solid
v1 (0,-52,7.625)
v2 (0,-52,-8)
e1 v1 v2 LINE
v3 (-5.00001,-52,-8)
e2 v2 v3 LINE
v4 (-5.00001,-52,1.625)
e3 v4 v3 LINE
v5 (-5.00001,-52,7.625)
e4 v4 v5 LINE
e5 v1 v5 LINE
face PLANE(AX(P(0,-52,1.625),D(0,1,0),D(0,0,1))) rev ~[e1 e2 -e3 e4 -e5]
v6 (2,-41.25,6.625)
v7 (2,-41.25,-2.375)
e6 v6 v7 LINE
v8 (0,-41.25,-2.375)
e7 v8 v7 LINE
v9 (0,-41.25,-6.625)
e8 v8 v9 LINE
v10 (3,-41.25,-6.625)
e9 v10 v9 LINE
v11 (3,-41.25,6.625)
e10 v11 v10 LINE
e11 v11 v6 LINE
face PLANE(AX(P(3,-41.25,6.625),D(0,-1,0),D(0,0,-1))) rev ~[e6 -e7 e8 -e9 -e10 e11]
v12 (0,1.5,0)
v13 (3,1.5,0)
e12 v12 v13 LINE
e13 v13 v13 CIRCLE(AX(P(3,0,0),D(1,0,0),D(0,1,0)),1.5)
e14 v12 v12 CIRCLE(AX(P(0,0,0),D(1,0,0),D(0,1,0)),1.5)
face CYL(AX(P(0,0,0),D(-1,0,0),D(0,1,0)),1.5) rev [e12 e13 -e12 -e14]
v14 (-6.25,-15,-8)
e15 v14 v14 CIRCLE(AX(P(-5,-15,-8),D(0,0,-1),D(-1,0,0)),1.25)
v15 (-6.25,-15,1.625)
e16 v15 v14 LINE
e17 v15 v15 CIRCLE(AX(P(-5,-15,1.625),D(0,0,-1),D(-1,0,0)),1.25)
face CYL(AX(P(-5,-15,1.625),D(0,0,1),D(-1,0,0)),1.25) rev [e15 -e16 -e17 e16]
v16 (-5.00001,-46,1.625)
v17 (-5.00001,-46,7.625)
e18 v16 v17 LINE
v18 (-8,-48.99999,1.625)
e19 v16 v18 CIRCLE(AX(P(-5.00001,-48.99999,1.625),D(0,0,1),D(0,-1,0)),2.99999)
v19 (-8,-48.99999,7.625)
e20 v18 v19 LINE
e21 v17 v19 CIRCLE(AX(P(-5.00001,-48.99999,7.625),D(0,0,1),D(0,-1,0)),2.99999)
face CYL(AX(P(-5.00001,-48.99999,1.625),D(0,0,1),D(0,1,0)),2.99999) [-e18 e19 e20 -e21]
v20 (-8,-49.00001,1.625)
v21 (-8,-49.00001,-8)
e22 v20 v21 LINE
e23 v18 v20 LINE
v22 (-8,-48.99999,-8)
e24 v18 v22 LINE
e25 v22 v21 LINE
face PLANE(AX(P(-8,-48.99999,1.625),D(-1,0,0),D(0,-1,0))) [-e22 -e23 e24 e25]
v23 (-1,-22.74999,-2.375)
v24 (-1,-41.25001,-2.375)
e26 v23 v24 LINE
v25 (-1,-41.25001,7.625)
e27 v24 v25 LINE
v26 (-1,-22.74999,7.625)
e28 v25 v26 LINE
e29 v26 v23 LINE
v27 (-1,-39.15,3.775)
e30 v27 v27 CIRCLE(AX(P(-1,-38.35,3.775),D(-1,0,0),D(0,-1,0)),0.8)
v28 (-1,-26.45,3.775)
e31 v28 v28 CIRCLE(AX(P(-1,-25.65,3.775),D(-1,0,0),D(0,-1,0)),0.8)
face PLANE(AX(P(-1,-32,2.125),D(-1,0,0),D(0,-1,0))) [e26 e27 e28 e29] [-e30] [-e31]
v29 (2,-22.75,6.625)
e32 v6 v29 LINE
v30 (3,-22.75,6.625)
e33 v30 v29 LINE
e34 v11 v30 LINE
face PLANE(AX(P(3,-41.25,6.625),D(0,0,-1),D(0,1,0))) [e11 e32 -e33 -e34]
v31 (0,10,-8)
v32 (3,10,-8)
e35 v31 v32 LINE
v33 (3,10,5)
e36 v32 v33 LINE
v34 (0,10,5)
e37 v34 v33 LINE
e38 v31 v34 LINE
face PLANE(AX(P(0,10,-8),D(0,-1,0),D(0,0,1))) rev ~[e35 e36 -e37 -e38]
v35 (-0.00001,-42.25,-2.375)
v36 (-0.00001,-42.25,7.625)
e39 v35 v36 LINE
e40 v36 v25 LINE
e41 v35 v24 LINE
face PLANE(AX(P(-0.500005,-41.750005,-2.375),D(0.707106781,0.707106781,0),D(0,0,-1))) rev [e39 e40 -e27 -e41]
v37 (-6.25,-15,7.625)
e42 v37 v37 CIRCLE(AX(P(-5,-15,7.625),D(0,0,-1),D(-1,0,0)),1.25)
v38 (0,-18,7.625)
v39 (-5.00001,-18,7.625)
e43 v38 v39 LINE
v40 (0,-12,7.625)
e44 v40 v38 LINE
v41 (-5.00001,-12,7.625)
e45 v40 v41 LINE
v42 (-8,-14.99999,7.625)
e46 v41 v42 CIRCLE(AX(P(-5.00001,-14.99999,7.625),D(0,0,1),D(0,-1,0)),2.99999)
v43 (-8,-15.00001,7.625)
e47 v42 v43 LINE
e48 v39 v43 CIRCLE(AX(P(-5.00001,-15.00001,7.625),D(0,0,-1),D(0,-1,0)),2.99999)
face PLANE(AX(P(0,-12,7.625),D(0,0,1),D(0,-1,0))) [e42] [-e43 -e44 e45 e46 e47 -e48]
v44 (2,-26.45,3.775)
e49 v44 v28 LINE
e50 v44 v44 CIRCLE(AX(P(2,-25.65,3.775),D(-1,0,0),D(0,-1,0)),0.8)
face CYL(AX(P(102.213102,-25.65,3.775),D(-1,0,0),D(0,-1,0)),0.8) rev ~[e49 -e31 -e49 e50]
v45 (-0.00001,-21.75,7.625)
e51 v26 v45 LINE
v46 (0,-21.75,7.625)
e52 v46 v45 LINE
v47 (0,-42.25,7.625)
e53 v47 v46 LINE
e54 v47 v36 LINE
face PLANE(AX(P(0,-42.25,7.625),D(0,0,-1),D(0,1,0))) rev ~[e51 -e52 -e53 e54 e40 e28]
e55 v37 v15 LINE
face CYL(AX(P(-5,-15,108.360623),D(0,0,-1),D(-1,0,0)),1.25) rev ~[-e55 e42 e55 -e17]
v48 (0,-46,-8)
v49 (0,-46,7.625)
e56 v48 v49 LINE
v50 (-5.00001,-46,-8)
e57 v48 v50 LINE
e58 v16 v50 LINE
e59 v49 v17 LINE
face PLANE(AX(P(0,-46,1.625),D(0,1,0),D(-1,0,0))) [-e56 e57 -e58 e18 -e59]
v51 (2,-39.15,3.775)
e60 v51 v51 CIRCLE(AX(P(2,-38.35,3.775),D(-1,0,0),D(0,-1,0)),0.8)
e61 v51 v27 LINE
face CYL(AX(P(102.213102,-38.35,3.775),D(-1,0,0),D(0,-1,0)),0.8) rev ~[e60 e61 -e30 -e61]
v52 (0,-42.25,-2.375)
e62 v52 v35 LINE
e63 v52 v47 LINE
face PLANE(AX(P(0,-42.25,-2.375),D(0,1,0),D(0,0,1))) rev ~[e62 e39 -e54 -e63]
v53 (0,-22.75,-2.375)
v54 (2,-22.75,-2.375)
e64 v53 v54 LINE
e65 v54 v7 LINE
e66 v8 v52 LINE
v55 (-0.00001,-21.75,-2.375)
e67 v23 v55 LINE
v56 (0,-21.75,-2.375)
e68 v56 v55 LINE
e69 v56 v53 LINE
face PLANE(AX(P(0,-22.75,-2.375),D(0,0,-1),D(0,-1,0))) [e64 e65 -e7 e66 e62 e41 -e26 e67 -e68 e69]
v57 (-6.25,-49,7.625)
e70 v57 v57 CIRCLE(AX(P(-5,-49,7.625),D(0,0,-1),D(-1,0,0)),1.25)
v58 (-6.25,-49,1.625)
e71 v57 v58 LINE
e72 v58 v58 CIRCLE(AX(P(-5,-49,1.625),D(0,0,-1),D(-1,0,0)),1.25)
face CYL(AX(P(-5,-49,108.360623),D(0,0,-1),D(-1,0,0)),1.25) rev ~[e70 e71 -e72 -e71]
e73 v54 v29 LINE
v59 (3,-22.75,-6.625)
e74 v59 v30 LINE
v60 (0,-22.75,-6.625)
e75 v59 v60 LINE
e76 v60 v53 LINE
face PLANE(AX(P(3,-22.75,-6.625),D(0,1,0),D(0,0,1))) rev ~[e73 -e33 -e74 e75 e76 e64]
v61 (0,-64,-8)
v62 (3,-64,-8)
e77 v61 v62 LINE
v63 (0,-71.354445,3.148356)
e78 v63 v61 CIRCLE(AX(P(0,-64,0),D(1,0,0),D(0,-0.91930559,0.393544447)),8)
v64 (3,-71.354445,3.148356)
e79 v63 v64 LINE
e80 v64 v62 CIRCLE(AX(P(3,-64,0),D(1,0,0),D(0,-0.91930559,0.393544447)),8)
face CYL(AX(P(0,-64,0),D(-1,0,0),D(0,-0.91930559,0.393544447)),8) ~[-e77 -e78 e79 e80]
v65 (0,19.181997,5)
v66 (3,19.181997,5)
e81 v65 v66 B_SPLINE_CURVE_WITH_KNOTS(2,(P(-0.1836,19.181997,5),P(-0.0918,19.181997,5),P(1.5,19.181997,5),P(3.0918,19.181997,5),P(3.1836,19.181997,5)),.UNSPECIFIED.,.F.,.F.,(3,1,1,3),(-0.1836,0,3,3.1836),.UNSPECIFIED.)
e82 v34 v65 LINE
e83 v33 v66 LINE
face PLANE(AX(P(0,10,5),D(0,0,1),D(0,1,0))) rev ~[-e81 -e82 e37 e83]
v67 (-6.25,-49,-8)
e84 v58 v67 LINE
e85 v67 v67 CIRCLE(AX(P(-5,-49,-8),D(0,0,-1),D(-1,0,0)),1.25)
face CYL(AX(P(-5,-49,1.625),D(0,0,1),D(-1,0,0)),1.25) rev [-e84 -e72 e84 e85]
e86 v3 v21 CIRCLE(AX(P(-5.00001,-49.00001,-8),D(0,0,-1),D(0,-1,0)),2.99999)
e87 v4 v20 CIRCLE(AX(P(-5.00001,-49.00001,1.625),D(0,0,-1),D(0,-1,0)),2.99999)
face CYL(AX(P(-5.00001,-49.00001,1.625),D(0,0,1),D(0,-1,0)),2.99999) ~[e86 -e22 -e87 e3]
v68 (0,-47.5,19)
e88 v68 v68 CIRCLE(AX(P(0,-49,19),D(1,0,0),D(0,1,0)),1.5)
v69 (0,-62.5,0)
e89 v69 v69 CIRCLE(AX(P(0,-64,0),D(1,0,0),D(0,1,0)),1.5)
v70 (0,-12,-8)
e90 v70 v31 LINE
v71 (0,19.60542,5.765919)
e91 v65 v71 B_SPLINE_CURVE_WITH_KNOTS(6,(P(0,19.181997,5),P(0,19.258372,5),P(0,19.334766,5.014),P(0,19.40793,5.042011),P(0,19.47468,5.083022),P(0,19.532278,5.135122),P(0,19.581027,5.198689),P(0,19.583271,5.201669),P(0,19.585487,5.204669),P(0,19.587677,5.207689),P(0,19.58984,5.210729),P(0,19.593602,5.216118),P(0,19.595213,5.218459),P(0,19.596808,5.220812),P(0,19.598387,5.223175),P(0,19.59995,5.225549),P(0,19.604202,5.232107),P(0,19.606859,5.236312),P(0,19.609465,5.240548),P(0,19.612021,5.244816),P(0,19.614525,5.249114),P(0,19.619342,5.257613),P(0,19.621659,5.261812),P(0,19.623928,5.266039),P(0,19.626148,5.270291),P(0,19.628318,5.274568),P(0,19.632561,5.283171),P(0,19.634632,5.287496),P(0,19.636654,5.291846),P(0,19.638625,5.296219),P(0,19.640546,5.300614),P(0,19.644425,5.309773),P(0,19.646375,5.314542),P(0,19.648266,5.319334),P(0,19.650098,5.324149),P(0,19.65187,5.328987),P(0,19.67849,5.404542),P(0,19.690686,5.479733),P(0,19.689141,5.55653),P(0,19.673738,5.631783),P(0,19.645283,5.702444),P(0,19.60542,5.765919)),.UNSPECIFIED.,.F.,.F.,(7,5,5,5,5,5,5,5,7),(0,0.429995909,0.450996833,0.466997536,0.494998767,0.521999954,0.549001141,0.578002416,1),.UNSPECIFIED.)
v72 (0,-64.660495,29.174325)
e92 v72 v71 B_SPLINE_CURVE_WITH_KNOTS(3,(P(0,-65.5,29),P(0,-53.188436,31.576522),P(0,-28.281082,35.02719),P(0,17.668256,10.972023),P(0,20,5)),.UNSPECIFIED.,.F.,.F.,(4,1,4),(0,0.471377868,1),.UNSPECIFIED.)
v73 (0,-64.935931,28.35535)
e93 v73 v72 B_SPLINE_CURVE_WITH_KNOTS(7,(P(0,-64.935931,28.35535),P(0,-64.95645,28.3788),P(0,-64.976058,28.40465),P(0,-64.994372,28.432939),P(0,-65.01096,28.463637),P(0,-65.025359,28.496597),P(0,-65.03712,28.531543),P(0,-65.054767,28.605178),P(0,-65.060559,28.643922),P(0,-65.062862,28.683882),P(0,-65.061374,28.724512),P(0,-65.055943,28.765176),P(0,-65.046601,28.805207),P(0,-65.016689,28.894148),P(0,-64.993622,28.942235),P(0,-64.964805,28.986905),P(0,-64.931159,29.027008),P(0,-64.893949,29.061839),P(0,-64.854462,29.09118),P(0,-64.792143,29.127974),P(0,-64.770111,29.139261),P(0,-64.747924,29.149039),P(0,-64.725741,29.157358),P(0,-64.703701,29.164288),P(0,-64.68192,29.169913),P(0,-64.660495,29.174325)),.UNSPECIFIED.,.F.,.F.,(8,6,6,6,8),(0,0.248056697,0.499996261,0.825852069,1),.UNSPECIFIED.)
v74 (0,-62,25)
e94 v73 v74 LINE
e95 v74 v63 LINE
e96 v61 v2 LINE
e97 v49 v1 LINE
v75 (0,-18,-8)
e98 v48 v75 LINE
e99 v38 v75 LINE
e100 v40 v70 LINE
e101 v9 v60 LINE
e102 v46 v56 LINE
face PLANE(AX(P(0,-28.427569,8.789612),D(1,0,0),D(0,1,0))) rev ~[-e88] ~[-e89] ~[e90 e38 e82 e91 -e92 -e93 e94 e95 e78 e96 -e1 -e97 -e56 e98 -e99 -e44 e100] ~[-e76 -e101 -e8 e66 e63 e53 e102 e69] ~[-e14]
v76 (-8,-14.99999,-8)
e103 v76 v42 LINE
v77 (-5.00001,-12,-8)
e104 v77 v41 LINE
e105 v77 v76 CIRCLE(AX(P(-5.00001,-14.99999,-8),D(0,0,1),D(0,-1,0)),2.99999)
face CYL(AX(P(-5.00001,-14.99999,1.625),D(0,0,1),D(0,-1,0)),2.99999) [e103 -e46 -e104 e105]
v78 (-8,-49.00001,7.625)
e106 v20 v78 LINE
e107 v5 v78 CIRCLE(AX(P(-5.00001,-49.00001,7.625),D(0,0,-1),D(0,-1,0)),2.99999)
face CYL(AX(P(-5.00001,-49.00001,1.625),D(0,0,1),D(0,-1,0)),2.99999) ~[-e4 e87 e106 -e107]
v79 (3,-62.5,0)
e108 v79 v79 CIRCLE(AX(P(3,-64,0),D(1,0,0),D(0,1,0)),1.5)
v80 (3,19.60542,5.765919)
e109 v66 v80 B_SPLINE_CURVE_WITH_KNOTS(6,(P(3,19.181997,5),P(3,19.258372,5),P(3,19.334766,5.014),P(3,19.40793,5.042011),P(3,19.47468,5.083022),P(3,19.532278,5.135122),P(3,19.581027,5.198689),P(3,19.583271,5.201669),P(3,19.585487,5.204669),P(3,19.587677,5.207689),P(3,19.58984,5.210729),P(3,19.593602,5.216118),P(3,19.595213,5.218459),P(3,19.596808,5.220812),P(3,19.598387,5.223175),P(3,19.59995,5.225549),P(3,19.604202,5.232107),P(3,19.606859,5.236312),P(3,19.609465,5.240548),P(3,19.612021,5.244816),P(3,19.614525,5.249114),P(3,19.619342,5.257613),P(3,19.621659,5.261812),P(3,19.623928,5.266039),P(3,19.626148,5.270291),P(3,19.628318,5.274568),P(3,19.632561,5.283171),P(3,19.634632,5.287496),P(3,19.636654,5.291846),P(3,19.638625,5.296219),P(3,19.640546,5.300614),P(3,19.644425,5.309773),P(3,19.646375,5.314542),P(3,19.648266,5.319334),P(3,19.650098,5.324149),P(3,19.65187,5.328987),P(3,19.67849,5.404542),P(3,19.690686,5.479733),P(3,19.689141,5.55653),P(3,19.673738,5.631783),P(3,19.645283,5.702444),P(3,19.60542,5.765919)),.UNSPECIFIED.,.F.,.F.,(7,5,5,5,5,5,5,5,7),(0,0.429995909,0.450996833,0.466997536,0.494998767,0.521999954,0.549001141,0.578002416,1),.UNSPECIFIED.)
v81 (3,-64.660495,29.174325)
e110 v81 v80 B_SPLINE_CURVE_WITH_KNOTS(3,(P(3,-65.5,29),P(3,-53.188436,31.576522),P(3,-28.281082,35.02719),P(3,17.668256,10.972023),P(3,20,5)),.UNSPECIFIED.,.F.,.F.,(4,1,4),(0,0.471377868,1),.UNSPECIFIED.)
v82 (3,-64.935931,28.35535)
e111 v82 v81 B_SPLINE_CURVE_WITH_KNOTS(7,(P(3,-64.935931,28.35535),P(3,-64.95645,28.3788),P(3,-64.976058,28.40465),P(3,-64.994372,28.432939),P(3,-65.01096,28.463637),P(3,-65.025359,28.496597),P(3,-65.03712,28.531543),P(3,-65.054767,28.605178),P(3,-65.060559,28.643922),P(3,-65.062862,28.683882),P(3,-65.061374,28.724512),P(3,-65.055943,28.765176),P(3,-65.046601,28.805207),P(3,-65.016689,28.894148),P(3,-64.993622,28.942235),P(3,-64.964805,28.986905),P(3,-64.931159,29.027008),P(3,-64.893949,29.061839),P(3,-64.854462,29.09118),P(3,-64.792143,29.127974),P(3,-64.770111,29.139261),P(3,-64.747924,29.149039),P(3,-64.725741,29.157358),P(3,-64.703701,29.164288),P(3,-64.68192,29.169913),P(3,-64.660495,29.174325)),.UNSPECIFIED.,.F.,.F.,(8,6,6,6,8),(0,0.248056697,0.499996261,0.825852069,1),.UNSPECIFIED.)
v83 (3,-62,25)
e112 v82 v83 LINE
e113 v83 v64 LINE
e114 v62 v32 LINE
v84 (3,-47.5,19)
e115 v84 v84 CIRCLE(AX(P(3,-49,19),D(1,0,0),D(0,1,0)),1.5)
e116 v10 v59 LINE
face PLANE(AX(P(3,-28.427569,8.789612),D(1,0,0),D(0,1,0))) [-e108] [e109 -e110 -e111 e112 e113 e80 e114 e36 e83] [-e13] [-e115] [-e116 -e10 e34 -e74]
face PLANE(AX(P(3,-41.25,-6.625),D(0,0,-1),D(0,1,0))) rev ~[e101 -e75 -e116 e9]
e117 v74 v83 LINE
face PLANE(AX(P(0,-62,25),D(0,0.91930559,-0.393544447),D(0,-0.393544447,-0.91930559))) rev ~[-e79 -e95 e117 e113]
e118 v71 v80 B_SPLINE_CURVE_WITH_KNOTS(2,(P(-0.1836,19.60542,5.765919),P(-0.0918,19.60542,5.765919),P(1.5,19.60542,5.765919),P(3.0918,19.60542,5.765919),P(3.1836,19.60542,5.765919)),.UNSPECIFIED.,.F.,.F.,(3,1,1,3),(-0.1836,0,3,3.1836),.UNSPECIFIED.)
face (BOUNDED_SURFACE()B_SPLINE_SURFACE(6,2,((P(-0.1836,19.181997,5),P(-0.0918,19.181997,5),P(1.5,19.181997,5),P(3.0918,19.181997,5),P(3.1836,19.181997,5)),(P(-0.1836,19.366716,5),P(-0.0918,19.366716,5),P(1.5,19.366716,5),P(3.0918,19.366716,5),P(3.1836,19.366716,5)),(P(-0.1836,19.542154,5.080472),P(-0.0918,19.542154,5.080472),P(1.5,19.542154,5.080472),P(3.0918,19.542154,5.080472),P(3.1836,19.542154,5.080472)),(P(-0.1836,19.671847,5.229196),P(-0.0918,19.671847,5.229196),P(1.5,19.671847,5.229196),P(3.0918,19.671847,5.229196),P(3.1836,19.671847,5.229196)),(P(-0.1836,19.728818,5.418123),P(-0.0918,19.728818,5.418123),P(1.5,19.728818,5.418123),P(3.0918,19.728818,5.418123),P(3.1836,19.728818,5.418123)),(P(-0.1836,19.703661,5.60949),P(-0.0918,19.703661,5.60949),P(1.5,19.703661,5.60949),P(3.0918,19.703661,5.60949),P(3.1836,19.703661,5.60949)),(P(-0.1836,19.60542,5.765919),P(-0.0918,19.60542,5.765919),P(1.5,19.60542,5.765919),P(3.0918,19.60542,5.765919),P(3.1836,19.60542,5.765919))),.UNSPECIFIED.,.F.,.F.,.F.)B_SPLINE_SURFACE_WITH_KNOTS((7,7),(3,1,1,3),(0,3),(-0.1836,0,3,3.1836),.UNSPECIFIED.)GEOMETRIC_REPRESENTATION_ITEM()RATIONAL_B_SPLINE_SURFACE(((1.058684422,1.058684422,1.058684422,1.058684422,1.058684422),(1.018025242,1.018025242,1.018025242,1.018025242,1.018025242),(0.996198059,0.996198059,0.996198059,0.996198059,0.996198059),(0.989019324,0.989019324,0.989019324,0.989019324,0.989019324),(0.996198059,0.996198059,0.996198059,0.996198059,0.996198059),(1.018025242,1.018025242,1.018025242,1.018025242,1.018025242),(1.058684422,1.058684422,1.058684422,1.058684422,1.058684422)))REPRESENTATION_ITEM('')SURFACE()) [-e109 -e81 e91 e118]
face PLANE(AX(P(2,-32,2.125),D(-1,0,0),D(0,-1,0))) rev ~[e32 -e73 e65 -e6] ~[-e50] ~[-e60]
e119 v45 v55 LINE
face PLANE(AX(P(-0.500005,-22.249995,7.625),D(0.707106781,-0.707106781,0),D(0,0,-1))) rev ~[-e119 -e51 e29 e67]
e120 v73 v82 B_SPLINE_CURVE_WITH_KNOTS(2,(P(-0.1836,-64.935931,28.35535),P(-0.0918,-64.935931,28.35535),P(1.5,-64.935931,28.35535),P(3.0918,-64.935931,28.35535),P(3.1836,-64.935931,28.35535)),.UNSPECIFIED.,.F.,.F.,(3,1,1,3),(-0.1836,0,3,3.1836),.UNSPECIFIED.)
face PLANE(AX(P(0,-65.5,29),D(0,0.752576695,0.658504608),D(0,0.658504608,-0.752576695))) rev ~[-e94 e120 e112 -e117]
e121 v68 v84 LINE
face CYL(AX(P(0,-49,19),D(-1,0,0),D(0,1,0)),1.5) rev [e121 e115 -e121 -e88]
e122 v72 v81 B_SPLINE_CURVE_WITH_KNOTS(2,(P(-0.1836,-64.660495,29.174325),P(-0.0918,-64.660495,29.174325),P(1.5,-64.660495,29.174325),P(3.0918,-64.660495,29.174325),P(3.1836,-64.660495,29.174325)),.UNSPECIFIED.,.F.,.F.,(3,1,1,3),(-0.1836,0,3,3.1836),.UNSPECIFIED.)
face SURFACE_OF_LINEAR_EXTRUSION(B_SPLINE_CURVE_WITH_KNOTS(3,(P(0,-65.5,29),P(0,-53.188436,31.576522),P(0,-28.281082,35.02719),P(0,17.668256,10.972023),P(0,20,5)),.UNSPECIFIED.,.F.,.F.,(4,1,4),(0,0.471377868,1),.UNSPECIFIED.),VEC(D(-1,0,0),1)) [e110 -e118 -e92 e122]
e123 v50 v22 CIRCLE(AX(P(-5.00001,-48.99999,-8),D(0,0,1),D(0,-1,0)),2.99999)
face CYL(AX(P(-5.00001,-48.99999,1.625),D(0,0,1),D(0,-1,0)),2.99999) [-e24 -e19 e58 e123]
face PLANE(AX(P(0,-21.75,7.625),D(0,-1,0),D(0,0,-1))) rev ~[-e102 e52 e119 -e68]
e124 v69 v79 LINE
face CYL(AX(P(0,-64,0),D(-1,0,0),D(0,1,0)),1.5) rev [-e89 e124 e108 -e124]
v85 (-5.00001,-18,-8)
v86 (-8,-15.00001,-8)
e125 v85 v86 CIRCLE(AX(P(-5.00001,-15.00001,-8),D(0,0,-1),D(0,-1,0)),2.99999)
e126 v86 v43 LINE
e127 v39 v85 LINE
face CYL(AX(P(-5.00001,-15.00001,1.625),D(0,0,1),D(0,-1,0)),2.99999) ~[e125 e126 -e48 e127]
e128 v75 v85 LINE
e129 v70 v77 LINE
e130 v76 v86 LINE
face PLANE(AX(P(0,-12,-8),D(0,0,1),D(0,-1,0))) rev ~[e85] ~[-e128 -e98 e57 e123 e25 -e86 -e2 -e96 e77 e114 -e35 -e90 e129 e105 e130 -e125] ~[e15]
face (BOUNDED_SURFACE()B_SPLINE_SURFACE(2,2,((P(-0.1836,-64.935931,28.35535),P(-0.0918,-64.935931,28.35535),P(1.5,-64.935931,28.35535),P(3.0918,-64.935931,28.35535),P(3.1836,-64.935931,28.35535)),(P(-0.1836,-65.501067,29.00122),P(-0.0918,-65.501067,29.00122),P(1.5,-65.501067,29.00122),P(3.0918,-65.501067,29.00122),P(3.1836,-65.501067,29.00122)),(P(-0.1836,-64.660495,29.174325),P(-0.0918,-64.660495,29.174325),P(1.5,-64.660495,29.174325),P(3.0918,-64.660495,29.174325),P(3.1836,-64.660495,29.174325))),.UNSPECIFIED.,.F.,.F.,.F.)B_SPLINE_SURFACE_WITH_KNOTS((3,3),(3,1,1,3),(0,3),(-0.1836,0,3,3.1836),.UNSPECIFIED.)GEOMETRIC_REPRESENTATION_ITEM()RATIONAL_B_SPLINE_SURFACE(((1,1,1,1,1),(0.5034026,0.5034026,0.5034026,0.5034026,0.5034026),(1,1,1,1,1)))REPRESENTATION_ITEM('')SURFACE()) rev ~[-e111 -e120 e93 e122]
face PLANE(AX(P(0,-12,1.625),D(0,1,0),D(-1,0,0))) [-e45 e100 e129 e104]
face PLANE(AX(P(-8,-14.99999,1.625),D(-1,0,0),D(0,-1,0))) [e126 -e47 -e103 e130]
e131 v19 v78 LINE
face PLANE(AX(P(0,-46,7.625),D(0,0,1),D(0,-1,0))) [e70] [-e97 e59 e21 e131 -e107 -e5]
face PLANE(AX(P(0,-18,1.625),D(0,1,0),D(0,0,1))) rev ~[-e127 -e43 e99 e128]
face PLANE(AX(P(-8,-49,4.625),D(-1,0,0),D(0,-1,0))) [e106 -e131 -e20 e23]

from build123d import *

# Parameters (mm, degrees)
F0_R      = 1.5
F1_DEPTH  = 3
F2_W      = 18.5
F2_H      = 6.625
F3_DEPTH  = 25
F4_W      = 18.5
F4_H      = 9
F5_DEPTH  = 1
F6_DEPTH  = 2
F8_D      = 1.6
F9_SIZE   = 0.99999
F10_W     = 6
F10_H     = 6
F11_DEPTH = 8
F12_R     = 2.99999
F13_W     = 6
F13_H     = 6
F14_DEPTH = 8
F15_R     = 2.99999
F17_D     = 2.5
F18_R     = 0.5
F19_DEPTH = 9.625


# Not quite as in the source:
# - a fillet or chamfer is up to 0.001 mm smaller than in the source, because OpenCascade refuses the exact size


with BuildPart() as f1:
    # F0 (on Right) → F1 (new body)
    with BuildSketch(Plane.YZ):
        with BuildLine():
            Line((-64, -8), (10, -8))
            Line((10, -8), (10, 5))
            Line((10, 5), (20, 5))
            add(Edge.make_bspline(
                [(-65.5, 29), (-53.1884357333, 31.5765216947), (-28.2810822655, 35.0271902112), (17.668255518, 10.972023372), (20, 5)],
                knots=[0, 0, 0, 0, 0.471377868, 1, 1, 1, 1], degree=3))
            Line((-65.5, 29), (-62, 25))
            Line((-62, 25), (-71.3544447211, 3.1483555777))
            ThreePointArc((-71.3544447211, 3.1483555777), (-70.677830659, -4.4052897395), (-64, -8))
        make_face()
        with Locations((-64, 0)):
            Circle(F0_R, mode=Mode.SUBTRACT)
        Circle(F0_R, mode=Mode.SUBTRACT)
        with Locations((-49, 19)):
            Circle(F0_R, mode=Mode.SUBTRACT)
    extrude(amount=F1_DEPTH)

    # F2 (on face) → F3 (cut)
    with BuildSketch(Plane.YZ.offset(3)):
        with Locations((-32, 3.3125)):
            Rectangle(F2_W, F2_H)
        with Locations((-32, -3.3125)):
            Rectangle(F2_W, F2_H)
    extrude(amount=-F3_DEPTH, mode=Mode.SUBTRACT)

    # F4 (on face) → F5 (join)
    with BuildSketch(Plane(origin=(0, 0, 0), x_dir=(0, -1, 0), z_dir=(-1, 0, 0))):
        with Locations((32, 2.125)):
            Rectangle(F4_W, F4_H)
        Polygon((42.25, -2.375), (42.25, 7.625), (21.75, 7.625), (21.75, -2.375), (22.75, -2.375), (22.75, 6.625), (41.25, 6.625), (41.25, -2.375), align=None)
    extrude(amount=F5_DEPTH)

    # F6 (add): a face of the model
    f6_faces = [f1.faces().sort_by_distance(p)[0] for p in [
        (0, -32, 2.125),
    ]]
    extrude(f6_faces, amount=F6_DEPTH)

    # F8 (through all)
    with Locations(Plane.YZ.offset(2)):
        with Locations((-38.35, 3.775), (-25.65, 3.775)):
            Hole(F8_D / 2)

    # F9 (size 1 in the source; OpenCascade refuses exactly that, so slightly less here)
    f9_edges = [f1.edges().sort_by_distance(p)[0] for p in [
        (-1, -21.75, 2.625),
        (-1, -42.25, 2.625),
    ]]
    chamfer(f9_edges, length=F9_SIZE)

    # F10 (on face) → F11 (join)
    with BuildSketch(Plane(origin=(0, 0, 0), x_dir=(0, -1, 0), z_dir=(-1, 0, 0))):
        with Locations((49, 4.625)):
            Rectangle(F10_W, F10_H)
    extrude(amount=F11_DEPTH)

    # F12 (radius 3 in the source; OpenCascade refuses exactly that, so slightly less here)
    f12_edges = [f1.edges().sort_by_distance(p)[0] for p in [
        (-8, -52, 4.625),
        (-8, -46, 4.625),
    ]]
    fillet(f12_edges, radius=F12_R)

    # F13 (on face) → F14 (join)
    with BuildSketch(Plane(origin=(0, 0, 0), x_dir=(0, -1, 0), z_dir=(-1, 0, 0))):
        with Locations((15, 4.625)):
            Rectangle(F13_W, F13_H)
    extrude(amount=F14_DEPTH)

    # F15 (radius 3 in the source; OpenCascade refuses exactly that, so slightly less here)
    f15_edges = [f1.edges().sort_by_distance(p)[0] for p in [
        (-8, -12, 4.625),
        (-8, -18, 4.625),
    ]]
    fillet(f15_edges, radius=F15_R)

    # F17 (through all)
    with Locations(Plane.XY.offset(7.625)):
        with Locations((-5, -49), (-5, -15)):
            Hole(F17_D / 2)

    # F18
    f18_edges = [f1.edges().sort_by_distance(p)[0] for p in [
        (1.5, -65.5, 29),
        (1.5, 20, 5),
    ]]
    fillet(f18_edges, radius=F18_R)

    # F19 (add): faces of the model
    f19_faces = [f1.faces().sort_by_distance(p)[0] for p in [
        (-3.5469743881, -15, 1.625),
        (-3.5469743881, -49, 1.625),
    ]]
    extrude(f19_faces, amount=F19_DEPTH)


solid = f1.part
